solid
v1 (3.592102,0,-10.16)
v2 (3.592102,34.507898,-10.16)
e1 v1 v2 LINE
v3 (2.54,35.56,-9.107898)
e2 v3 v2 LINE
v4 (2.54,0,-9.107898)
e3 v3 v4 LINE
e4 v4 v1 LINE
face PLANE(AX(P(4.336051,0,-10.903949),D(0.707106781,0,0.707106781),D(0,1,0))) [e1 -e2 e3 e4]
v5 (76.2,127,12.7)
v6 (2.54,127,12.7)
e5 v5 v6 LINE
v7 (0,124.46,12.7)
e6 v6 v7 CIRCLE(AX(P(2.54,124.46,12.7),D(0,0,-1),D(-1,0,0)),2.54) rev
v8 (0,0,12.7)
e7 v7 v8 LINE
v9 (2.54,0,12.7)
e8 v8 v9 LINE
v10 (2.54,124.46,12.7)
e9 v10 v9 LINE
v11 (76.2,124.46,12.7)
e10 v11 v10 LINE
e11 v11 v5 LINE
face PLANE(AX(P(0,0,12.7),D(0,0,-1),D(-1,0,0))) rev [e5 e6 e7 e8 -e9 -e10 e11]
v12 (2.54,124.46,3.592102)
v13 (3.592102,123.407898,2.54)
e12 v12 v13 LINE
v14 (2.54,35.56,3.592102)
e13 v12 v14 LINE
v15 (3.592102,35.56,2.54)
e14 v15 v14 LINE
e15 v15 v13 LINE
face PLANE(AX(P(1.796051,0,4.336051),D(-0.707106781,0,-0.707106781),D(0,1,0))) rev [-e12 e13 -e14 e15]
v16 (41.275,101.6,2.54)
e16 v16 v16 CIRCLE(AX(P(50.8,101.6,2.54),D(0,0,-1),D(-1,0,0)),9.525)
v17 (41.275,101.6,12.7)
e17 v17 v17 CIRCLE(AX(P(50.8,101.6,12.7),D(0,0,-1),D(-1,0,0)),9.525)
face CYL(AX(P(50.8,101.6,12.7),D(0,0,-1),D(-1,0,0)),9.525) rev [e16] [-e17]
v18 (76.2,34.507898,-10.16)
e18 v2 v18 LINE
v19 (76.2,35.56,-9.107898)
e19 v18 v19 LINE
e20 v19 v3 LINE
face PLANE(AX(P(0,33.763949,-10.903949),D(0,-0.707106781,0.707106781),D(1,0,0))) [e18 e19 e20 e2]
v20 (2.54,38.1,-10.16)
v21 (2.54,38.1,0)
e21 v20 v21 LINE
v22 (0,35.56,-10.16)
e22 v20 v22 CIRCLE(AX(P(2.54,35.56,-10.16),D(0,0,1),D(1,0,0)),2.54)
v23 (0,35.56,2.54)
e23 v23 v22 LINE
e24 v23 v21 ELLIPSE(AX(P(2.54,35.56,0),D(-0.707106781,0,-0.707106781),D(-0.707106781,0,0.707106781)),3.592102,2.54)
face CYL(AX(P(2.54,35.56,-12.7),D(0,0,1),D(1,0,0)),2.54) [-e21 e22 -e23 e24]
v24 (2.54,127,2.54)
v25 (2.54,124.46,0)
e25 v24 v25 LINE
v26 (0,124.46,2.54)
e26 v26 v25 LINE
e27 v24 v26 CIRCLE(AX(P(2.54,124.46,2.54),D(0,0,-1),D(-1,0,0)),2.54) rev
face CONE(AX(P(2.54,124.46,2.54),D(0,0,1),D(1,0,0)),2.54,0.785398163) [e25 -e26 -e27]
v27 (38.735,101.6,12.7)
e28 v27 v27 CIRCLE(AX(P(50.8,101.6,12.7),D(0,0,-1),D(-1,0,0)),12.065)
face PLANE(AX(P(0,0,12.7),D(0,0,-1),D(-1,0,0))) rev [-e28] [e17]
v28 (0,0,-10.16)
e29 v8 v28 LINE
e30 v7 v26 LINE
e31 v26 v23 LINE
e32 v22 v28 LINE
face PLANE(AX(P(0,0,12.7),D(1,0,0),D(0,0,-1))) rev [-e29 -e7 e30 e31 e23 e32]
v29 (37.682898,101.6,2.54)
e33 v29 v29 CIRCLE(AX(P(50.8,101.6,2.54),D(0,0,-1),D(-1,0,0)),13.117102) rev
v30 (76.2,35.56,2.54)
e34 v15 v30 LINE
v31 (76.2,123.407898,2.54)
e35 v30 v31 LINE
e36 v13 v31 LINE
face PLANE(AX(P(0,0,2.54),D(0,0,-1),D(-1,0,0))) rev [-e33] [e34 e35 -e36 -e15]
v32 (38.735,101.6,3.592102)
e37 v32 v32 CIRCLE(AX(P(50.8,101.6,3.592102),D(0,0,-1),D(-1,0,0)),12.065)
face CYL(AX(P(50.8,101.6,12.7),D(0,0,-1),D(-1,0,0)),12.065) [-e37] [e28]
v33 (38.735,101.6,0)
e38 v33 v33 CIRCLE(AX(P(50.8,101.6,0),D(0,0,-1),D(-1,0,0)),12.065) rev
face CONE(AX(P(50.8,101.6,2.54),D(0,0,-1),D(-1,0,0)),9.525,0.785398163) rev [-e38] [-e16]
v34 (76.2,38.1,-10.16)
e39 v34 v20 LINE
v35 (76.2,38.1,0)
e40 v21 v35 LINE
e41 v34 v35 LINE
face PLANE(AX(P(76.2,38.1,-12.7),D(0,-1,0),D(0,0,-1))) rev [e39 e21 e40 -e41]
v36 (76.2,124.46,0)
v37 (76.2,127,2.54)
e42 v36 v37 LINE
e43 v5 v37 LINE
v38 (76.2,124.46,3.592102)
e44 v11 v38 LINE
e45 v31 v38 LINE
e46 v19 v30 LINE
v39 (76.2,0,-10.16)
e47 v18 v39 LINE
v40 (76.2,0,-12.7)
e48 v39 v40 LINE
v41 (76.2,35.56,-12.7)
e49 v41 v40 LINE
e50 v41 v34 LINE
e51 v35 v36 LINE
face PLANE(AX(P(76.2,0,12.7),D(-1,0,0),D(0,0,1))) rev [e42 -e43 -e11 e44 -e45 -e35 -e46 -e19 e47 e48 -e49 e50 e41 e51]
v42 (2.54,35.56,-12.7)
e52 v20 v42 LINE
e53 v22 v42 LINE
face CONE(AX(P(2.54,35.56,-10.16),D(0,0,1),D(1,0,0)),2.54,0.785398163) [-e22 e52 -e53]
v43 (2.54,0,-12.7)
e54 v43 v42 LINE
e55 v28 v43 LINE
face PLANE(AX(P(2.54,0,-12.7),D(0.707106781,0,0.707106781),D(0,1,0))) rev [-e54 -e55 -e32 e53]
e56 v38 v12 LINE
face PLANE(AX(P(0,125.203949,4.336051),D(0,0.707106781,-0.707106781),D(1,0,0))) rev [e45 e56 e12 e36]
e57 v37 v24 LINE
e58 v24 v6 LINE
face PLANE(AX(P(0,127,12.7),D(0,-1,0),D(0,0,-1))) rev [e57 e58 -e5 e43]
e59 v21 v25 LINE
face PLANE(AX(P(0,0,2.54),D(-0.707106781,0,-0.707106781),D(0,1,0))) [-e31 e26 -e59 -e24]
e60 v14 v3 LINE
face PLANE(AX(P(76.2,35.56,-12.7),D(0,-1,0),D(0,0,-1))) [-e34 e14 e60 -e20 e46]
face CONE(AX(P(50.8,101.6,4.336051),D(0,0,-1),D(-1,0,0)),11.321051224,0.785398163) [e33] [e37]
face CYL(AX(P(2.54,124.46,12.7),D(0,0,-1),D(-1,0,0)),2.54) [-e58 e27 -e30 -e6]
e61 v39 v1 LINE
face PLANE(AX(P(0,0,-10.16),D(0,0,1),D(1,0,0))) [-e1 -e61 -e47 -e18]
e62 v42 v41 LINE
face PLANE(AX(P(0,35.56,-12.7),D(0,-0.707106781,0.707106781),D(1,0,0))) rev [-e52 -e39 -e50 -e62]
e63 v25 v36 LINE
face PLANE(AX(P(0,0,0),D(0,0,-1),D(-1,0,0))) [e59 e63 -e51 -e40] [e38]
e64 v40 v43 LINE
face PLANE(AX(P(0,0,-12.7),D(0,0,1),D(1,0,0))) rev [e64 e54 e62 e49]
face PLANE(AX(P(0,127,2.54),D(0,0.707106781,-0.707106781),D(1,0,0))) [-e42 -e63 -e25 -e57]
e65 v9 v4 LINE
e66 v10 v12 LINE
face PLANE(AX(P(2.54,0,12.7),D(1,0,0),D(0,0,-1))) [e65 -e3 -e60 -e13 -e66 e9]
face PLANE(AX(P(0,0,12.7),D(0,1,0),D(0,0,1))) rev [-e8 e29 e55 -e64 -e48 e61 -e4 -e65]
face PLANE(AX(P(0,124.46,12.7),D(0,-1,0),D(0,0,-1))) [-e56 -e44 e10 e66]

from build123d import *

# Parameters (mm, degrees)
SKETCH1_W           = 76.2
SKETCH1_H           = 127
BOSS_EXTRUDE2_DEPTH = 12.7
SKETCH2_W           = 76.2
SKETCH2_H           = 38.1
BOSS_EXTRUDE3_DEPTH = 12.7
SKETCH4_R           = 9.525
CUT_EXTRUDE1_DEPTH  = 149.649688866
FILLET1_R           = 2.54
CHAMFER1_SIZE       = 2.54
SHELL1_START        = 2.54
SHELL1_DEPTH        = 73.66
SHELL1_START_2      = 35.56
SHELL1_3_DEPTH      = 89.44
SHELL1_4_DEPTH      = 35.56


with BuildPart() as part:
    # Sketch1 → Boss-Extrude2 (new body)
    with BuildSketch(Plane.XY):
        with Locations((38.1, 63.5)):
            Rectangle(SKETCH1_W, SKETCH1_H)
    extrude(amount=BOSS_EXTRUDE2_DEPTH)

    # Sketch2 → Boss-Extrude3 (add)
    with BuildSketch(Plane(origin=(0, 0, 0), x_dir=(-1, 0, 0), z_dir=(0, 0, -1))):
        with Locations((-38.1, 19.05)):
            Rectangle(SKETCH2_W, SKETCH2_H)
    extrude(amount=BOSS_EXTRUDE3_DEPTH)

    # Sketch4 → Cut-Extrude1 (cut, through all)
    with BuildSketch(Plane(origin=(0, 0, 0), x_dir=(-1, 0, 0), z_dir=(0, 0, -1))):
        with Locations((-50.8, 101.6)):
            Circle(SKETCH4_R)
    extrude(amount=-CUT_EXTRUDE1_DEPTH, mode=Mode.SUBTRACT)

    # Fillet1
    fillet1_edges = [part.edges().sort_by_distance(p)[0] for p in [
        (0, 38.1, -6.35),
        (0, 127, 6.35),
    ]]
    fillet(fillet1_edges, radius=FILLET1_R)

    # Chamfer1
    chamfer1_edges = [part.edges().sort_by_distance(p)[0] for p in [
        (60.325, 101.6, 0),
        (0, 80.01, 0),
        (0.743948776, 126.256051224, 0),
        (39.37, 127, 0),
        (0, 17.78, -12.7),
        (0.743948776, 37.356051224, -12.7),
        (39.37, 38.1, -12.7),
    ]]
    chamfer(chamfer1_edges, length=CHAMFER1_SIZE)

    # Shell1: read off the stored shape, not the designer's step
    # Shell1 outline → Shell1 (cut)
    with BuildSketch(Plane.YZ.offset(SHELL1_START)):
        Polygon((124.46, 3.592102448), (124.46, 12.7), (0, 12.7), (0, -10.16), (34.507897552, -10.16), (35.56, -9.107897552), (35.56, 2.54), (123.407897552, 2.54), align=None)
    extrude(amount=SHELL1_DEPTH, mode=Mode.SUBTRACT)

    # Shell1 2 outline → Shell1 2 (revolve)
    with BuildSketch(Plane(origin=(50.8, 101.6, 0), x_dir=(1, 0, 0), z_dir=(0, -1, 0))):
        Polygon((12.065, 12.7), (9.525, 12.7), (9.525, 2.54), (13.117102448, 2.54), (12.065, 3.592102448), align=None)
    revolve(axis=Axis((50.8, 101.6, 0), (0, 0, 1)))

    # Shell1 3 outline → Shell1 3 (add)
    with BuildSketch(Plane(origin=(0, 0, 0), x_dir=(1, 0, 0), z_dir=(0, 1, 0)).offset(SHELL1_START_2)):
        Polygon((2.54, -3.592102448), (3.592102448, -2.54), (2.54, -2.54), align=None)
    extrude(amount=SHELL1_3_DEPTH)

    # Shell1 4 outline → Shell1 4 (add)
    with BuildSketch(Plane(origin=(0, 0, 0), x_dir=(1, 0, 0), z_dir=(0, 1, 0))):
        Polygon((2.54, 10.16), (2.54, 9.107897552), (3.592102448, 10.16), align=None)
    extrude(amount=SHELL1_4_DEPTH)


solid = part.part
